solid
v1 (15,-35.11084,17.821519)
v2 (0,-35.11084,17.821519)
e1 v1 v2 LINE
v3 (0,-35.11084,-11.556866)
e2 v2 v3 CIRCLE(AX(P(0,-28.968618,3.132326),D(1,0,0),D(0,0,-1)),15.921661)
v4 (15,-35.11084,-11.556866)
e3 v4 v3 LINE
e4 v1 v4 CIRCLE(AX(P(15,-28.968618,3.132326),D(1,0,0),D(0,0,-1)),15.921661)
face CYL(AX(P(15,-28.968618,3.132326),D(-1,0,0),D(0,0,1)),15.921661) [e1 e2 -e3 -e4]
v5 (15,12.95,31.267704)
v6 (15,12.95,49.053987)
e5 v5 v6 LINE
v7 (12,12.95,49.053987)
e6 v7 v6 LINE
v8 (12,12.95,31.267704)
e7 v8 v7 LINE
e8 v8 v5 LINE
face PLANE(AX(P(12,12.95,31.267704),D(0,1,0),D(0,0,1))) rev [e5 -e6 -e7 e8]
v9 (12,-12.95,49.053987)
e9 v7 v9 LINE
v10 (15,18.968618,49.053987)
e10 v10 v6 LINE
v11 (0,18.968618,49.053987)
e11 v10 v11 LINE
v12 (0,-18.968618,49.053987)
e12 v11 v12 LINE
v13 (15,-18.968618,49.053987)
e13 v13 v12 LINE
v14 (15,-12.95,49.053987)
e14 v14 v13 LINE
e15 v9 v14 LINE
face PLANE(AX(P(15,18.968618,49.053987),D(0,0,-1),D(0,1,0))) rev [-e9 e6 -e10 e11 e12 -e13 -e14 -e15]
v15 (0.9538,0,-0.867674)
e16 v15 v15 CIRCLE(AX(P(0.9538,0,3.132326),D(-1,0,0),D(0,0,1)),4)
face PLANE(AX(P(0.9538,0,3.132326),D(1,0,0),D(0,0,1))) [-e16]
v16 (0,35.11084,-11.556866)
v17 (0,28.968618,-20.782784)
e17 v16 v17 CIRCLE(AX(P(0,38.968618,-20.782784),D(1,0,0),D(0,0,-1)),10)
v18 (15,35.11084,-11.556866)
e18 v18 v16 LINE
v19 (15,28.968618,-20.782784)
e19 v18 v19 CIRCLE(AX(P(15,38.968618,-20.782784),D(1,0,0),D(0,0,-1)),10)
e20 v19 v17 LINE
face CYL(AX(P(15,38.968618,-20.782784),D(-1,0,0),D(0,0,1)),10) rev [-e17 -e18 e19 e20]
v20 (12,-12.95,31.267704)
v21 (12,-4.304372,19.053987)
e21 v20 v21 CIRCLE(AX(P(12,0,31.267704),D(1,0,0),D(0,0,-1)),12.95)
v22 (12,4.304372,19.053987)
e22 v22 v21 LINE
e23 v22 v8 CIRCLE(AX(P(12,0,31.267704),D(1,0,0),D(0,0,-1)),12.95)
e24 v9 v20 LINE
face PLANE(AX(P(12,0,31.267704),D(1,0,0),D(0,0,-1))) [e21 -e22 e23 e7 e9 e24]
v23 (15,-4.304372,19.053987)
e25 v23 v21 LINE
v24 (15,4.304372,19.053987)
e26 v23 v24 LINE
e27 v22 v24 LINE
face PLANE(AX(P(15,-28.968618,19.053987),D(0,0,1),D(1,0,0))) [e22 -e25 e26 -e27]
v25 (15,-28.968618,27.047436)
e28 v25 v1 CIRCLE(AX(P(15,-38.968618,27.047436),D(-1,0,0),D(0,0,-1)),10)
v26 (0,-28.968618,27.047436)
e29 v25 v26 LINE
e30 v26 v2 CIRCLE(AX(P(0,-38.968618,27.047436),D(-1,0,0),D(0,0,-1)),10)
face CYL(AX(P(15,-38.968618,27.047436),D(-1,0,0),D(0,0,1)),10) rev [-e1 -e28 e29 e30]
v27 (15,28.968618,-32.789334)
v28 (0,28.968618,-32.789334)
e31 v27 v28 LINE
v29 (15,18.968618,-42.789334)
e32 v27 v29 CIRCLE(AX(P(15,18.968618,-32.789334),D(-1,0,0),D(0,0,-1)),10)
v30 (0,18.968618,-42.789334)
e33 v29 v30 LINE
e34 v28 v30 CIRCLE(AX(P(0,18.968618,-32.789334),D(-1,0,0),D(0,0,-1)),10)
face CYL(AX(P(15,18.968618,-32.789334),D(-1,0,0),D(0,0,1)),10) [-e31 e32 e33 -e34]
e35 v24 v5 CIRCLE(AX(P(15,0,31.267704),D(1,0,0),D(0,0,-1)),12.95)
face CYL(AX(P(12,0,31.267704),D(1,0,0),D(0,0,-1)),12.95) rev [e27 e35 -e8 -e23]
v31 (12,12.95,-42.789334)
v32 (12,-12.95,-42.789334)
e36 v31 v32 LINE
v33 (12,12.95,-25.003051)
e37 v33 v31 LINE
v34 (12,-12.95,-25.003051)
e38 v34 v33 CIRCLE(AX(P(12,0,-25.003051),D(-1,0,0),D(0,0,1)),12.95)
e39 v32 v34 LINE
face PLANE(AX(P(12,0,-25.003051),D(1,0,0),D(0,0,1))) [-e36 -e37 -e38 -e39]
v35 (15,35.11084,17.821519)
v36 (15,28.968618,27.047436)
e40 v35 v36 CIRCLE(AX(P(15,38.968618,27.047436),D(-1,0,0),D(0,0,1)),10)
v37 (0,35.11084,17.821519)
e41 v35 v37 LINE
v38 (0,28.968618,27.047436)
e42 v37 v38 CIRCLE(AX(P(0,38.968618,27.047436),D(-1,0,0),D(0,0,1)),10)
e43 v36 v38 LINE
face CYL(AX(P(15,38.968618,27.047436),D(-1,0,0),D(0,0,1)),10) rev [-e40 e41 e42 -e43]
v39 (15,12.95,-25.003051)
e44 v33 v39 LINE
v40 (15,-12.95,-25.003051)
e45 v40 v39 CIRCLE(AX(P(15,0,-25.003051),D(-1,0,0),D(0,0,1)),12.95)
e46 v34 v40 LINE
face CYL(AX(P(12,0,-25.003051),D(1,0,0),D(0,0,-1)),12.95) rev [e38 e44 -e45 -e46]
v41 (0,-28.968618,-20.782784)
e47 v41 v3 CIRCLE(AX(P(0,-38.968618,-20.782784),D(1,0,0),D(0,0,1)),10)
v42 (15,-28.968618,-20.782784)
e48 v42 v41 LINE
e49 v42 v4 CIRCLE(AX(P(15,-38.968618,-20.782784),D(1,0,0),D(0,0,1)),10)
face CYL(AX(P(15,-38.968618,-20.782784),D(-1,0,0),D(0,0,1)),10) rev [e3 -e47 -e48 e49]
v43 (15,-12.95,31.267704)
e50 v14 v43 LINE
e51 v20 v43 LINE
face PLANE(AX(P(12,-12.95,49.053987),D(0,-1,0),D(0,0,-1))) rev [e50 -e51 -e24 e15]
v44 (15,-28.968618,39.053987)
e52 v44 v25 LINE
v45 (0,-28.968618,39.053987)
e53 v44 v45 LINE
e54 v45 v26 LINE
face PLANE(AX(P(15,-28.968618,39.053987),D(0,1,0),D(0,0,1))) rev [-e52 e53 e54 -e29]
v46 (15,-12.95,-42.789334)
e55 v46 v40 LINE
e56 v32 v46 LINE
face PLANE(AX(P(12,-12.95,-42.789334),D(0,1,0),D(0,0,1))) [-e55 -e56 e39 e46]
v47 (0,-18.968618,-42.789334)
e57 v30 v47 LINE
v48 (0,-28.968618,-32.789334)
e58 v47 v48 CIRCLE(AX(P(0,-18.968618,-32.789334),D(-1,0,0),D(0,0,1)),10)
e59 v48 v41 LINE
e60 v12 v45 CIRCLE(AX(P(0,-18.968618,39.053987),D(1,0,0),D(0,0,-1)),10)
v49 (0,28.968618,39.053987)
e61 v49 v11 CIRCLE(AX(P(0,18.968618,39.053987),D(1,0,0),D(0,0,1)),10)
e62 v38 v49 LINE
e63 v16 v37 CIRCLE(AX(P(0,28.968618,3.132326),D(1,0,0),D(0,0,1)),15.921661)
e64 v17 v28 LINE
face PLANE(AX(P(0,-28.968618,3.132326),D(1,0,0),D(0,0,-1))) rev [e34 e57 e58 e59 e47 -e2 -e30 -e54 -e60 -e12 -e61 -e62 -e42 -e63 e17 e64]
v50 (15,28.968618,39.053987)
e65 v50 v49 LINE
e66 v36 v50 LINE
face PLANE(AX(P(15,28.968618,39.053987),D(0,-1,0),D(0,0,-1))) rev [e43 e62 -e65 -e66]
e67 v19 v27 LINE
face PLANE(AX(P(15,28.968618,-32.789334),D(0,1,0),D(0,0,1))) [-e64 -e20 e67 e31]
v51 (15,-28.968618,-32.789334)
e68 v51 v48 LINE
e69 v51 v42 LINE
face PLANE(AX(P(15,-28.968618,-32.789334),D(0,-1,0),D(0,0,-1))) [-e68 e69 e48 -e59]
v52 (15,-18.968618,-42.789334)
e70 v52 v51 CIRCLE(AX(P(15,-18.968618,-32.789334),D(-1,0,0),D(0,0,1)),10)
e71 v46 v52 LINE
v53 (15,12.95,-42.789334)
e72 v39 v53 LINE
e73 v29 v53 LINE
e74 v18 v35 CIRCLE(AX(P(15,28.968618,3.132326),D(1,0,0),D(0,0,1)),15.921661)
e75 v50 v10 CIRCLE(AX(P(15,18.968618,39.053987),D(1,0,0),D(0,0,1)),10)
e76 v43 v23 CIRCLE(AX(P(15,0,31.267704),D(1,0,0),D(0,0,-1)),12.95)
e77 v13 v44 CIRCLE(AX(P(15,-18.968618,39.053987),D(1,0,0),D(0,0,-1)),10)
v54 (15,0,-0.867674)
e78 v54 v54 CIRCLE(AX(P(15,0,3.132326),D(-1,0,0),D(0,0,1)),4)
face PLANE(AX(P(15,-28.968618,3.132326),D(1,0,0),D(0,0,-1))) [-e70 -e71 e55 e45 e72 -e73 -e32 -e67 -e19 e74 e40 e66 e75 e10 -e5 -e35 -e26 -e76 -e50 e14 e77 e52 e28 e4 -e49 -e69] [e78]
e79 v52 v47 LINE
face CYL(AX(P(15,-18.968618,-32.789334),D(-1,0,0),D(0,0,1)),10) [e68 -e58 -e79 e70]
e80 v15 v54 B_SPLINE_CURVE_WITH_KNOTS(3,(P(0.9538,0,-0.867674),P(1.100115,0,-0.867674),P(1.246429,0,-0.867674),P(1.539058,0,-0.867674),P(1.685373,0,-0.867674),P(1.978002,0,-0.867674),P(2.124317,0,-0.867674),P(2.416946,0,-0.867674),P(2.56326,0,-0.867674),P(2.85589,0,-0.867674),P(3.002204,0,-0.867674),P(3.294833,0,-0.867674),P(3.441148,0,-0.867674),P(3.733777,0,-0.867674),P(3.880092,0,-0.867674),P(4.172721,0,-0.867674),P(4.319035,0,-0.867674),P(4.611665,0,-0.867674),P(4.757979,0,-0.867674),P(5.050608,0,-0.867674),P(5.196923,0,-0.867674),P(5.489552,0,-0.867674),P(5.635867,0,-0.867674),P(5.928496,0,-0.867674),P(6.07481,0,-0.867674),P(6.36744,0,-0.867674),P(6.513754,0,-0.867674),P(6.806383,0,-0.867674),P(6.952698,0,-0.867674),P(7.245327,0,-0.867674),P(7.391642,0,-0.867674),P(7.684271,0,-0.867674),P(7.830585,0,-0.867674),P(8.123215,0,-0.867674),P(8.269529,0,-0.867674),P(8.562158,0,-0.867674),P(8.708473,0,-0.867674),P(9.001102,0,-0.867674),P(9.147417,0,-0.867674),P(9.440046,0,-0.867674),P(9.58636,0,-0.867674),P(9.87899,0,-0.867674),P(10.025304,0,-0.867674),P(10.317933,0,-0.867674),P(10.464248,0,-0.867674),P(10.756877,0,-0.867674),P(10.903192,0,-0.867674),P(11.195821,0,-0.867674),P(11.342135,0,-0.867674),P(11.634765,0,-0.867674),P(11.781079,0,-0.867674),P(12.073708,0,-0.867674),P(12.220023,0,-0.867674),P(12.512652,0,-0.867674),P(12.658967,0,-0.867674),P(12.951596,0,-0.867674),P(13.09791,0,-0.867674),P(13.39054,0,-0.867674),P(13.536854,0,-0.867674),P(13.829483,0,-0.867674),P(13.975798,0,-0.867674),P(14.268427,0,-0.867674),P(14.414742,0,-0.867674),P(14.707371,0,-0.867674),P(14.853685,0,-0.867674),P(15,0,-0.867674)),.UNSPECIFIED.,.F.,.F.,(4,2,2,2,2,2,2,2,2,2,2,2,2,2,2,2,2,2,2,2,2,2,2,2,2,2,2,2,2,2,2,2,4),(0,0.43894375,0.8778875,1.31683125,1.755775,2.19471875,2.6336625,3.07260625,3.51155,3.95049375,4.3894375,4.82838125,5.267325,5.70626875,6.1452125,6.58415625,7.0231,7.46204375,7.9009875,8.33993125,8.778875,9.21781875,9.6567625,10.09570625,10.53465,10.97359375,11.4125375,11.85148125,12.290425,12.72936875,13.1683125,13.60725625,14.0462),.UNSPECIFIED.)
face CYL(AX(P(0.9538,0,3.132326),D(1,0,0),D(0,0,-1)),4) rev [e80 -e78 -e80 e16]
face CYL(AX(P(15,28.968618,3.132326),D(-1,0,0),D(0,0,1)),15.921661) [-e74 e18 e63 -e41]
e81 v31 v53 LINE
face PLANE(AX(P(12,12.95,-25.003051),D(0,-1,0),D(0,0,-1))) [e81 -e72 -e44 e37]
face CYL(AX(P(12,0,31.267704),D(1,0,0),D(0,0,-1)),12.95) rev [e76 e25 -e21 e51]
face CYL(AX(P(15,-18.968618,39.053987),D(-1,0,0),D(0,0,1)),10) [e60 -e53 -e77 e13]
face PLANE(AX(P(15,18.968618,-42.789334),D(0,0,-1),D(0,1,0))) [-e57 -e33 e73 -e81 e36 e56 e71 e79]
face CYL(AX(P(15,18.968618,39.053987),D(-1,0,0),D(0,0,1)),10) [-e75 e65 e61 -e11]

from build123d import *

# Parameters (mm, degrees)
BOSS_EXTRUDE3_DEPTH = 15
SKETCH3_R           = 4
CUT_EXTRUDE3_DEPTH  = 14.0462
CUT_EXTRUDE4_DEPTH  = 3


with BuildPart() as part:
    # Sketch1 → Boss-Extrude3 (new body)
    with BuildSketch(Plane.YZ):
        with BuildLine():
            Line((-28.968617751, -12.789334175), (28.968617751, -12.789334175))
            ThreePointArc((28.968617751, -12.789334175), (44.579120821, 0), (35.110840206, 17.821518929))
            ThreePointArc((35.110840206, 17.821518929), (30.644623053, 21.505675602), (28.968617751, 27.047436358))
            Line((28.968617751, 27.047436358), (28.968617751, 39.053986921))
            ThreePointArc((28.968617751, 39.053986921), (26.039685563, 46.125054733), (18.968617751, 49.053986921))
            Line((18.968617751, 49.053986921), (-18.968617751, 49.053986921))
            ThreePointArc((-18.968617751, 49.053986921), (-26.039685563, 46.125054733), (-28.968617751, 39.053986921))
            Line((-28.968617751, 39.053986921), (-28.968617751, 27.047436358))
            ThreePointArc((-28.968617751, 27.047436358), (-30.644623053, 21.505675602), (-35.110840206, 17.821518929))
            ThreePointArc((-35.110840206, 17.821518929), (-44.579120821, 0), (-28.968617751, -12.789334175))
        make_face()
    boss_extrude3 = extrude(amount=BOSS_EXTRUDE3_DEPTH)

    # Sketch3 → Cut-Extrude3 (cut)
    with BuildSketch(Plane.YZ.offset(15)):
        with Locations((0, 3.132326373)):
            Circle(SKETCH3_R)
    cut_extrude3 = extrude(amount=-CUT_EXTRUDE3_DEPTH, mode=Mode.SUBTRACT)

    # Sketch4 → Cut-Extrude4 (cut)
    with BuildSketch(Plane.YZ.offset(15)):
        with BuildLine():
            Line((-12.95, 49.053986921), (-12.95, 31.267703884))
            ThreePointArc((-12.95, 31.267703884), (0, 18.317703884), (12.95, 31.267703884))
            Line((12.95, 31.267703884), (12.95, 49.053986921))
            Line((12.95, 49.053986921), (-12.95, 49.053986921))
        make_face()
    cut_extrude4 = extrude(amount=-CUT_EXTRUDE4_DEPTH, mode=Mode.SUBTRACT)

    # Mirror1: Boss-Extrude3, Cut-Extrude3, Cut-Extrude4 across plane
    add(boss_extrude3.mirror(Plane.XY.offset(3.132326373)))
    add(cut_extrude3.mirror(Plane.XY.offset(3.132326373)), mode=Mode.SUBTRACT)
    add(cut_extrude4.mirror(Plane.XY.offset(3.132326373)), mode=Mode.SUBTRACT)


solid = part.part
